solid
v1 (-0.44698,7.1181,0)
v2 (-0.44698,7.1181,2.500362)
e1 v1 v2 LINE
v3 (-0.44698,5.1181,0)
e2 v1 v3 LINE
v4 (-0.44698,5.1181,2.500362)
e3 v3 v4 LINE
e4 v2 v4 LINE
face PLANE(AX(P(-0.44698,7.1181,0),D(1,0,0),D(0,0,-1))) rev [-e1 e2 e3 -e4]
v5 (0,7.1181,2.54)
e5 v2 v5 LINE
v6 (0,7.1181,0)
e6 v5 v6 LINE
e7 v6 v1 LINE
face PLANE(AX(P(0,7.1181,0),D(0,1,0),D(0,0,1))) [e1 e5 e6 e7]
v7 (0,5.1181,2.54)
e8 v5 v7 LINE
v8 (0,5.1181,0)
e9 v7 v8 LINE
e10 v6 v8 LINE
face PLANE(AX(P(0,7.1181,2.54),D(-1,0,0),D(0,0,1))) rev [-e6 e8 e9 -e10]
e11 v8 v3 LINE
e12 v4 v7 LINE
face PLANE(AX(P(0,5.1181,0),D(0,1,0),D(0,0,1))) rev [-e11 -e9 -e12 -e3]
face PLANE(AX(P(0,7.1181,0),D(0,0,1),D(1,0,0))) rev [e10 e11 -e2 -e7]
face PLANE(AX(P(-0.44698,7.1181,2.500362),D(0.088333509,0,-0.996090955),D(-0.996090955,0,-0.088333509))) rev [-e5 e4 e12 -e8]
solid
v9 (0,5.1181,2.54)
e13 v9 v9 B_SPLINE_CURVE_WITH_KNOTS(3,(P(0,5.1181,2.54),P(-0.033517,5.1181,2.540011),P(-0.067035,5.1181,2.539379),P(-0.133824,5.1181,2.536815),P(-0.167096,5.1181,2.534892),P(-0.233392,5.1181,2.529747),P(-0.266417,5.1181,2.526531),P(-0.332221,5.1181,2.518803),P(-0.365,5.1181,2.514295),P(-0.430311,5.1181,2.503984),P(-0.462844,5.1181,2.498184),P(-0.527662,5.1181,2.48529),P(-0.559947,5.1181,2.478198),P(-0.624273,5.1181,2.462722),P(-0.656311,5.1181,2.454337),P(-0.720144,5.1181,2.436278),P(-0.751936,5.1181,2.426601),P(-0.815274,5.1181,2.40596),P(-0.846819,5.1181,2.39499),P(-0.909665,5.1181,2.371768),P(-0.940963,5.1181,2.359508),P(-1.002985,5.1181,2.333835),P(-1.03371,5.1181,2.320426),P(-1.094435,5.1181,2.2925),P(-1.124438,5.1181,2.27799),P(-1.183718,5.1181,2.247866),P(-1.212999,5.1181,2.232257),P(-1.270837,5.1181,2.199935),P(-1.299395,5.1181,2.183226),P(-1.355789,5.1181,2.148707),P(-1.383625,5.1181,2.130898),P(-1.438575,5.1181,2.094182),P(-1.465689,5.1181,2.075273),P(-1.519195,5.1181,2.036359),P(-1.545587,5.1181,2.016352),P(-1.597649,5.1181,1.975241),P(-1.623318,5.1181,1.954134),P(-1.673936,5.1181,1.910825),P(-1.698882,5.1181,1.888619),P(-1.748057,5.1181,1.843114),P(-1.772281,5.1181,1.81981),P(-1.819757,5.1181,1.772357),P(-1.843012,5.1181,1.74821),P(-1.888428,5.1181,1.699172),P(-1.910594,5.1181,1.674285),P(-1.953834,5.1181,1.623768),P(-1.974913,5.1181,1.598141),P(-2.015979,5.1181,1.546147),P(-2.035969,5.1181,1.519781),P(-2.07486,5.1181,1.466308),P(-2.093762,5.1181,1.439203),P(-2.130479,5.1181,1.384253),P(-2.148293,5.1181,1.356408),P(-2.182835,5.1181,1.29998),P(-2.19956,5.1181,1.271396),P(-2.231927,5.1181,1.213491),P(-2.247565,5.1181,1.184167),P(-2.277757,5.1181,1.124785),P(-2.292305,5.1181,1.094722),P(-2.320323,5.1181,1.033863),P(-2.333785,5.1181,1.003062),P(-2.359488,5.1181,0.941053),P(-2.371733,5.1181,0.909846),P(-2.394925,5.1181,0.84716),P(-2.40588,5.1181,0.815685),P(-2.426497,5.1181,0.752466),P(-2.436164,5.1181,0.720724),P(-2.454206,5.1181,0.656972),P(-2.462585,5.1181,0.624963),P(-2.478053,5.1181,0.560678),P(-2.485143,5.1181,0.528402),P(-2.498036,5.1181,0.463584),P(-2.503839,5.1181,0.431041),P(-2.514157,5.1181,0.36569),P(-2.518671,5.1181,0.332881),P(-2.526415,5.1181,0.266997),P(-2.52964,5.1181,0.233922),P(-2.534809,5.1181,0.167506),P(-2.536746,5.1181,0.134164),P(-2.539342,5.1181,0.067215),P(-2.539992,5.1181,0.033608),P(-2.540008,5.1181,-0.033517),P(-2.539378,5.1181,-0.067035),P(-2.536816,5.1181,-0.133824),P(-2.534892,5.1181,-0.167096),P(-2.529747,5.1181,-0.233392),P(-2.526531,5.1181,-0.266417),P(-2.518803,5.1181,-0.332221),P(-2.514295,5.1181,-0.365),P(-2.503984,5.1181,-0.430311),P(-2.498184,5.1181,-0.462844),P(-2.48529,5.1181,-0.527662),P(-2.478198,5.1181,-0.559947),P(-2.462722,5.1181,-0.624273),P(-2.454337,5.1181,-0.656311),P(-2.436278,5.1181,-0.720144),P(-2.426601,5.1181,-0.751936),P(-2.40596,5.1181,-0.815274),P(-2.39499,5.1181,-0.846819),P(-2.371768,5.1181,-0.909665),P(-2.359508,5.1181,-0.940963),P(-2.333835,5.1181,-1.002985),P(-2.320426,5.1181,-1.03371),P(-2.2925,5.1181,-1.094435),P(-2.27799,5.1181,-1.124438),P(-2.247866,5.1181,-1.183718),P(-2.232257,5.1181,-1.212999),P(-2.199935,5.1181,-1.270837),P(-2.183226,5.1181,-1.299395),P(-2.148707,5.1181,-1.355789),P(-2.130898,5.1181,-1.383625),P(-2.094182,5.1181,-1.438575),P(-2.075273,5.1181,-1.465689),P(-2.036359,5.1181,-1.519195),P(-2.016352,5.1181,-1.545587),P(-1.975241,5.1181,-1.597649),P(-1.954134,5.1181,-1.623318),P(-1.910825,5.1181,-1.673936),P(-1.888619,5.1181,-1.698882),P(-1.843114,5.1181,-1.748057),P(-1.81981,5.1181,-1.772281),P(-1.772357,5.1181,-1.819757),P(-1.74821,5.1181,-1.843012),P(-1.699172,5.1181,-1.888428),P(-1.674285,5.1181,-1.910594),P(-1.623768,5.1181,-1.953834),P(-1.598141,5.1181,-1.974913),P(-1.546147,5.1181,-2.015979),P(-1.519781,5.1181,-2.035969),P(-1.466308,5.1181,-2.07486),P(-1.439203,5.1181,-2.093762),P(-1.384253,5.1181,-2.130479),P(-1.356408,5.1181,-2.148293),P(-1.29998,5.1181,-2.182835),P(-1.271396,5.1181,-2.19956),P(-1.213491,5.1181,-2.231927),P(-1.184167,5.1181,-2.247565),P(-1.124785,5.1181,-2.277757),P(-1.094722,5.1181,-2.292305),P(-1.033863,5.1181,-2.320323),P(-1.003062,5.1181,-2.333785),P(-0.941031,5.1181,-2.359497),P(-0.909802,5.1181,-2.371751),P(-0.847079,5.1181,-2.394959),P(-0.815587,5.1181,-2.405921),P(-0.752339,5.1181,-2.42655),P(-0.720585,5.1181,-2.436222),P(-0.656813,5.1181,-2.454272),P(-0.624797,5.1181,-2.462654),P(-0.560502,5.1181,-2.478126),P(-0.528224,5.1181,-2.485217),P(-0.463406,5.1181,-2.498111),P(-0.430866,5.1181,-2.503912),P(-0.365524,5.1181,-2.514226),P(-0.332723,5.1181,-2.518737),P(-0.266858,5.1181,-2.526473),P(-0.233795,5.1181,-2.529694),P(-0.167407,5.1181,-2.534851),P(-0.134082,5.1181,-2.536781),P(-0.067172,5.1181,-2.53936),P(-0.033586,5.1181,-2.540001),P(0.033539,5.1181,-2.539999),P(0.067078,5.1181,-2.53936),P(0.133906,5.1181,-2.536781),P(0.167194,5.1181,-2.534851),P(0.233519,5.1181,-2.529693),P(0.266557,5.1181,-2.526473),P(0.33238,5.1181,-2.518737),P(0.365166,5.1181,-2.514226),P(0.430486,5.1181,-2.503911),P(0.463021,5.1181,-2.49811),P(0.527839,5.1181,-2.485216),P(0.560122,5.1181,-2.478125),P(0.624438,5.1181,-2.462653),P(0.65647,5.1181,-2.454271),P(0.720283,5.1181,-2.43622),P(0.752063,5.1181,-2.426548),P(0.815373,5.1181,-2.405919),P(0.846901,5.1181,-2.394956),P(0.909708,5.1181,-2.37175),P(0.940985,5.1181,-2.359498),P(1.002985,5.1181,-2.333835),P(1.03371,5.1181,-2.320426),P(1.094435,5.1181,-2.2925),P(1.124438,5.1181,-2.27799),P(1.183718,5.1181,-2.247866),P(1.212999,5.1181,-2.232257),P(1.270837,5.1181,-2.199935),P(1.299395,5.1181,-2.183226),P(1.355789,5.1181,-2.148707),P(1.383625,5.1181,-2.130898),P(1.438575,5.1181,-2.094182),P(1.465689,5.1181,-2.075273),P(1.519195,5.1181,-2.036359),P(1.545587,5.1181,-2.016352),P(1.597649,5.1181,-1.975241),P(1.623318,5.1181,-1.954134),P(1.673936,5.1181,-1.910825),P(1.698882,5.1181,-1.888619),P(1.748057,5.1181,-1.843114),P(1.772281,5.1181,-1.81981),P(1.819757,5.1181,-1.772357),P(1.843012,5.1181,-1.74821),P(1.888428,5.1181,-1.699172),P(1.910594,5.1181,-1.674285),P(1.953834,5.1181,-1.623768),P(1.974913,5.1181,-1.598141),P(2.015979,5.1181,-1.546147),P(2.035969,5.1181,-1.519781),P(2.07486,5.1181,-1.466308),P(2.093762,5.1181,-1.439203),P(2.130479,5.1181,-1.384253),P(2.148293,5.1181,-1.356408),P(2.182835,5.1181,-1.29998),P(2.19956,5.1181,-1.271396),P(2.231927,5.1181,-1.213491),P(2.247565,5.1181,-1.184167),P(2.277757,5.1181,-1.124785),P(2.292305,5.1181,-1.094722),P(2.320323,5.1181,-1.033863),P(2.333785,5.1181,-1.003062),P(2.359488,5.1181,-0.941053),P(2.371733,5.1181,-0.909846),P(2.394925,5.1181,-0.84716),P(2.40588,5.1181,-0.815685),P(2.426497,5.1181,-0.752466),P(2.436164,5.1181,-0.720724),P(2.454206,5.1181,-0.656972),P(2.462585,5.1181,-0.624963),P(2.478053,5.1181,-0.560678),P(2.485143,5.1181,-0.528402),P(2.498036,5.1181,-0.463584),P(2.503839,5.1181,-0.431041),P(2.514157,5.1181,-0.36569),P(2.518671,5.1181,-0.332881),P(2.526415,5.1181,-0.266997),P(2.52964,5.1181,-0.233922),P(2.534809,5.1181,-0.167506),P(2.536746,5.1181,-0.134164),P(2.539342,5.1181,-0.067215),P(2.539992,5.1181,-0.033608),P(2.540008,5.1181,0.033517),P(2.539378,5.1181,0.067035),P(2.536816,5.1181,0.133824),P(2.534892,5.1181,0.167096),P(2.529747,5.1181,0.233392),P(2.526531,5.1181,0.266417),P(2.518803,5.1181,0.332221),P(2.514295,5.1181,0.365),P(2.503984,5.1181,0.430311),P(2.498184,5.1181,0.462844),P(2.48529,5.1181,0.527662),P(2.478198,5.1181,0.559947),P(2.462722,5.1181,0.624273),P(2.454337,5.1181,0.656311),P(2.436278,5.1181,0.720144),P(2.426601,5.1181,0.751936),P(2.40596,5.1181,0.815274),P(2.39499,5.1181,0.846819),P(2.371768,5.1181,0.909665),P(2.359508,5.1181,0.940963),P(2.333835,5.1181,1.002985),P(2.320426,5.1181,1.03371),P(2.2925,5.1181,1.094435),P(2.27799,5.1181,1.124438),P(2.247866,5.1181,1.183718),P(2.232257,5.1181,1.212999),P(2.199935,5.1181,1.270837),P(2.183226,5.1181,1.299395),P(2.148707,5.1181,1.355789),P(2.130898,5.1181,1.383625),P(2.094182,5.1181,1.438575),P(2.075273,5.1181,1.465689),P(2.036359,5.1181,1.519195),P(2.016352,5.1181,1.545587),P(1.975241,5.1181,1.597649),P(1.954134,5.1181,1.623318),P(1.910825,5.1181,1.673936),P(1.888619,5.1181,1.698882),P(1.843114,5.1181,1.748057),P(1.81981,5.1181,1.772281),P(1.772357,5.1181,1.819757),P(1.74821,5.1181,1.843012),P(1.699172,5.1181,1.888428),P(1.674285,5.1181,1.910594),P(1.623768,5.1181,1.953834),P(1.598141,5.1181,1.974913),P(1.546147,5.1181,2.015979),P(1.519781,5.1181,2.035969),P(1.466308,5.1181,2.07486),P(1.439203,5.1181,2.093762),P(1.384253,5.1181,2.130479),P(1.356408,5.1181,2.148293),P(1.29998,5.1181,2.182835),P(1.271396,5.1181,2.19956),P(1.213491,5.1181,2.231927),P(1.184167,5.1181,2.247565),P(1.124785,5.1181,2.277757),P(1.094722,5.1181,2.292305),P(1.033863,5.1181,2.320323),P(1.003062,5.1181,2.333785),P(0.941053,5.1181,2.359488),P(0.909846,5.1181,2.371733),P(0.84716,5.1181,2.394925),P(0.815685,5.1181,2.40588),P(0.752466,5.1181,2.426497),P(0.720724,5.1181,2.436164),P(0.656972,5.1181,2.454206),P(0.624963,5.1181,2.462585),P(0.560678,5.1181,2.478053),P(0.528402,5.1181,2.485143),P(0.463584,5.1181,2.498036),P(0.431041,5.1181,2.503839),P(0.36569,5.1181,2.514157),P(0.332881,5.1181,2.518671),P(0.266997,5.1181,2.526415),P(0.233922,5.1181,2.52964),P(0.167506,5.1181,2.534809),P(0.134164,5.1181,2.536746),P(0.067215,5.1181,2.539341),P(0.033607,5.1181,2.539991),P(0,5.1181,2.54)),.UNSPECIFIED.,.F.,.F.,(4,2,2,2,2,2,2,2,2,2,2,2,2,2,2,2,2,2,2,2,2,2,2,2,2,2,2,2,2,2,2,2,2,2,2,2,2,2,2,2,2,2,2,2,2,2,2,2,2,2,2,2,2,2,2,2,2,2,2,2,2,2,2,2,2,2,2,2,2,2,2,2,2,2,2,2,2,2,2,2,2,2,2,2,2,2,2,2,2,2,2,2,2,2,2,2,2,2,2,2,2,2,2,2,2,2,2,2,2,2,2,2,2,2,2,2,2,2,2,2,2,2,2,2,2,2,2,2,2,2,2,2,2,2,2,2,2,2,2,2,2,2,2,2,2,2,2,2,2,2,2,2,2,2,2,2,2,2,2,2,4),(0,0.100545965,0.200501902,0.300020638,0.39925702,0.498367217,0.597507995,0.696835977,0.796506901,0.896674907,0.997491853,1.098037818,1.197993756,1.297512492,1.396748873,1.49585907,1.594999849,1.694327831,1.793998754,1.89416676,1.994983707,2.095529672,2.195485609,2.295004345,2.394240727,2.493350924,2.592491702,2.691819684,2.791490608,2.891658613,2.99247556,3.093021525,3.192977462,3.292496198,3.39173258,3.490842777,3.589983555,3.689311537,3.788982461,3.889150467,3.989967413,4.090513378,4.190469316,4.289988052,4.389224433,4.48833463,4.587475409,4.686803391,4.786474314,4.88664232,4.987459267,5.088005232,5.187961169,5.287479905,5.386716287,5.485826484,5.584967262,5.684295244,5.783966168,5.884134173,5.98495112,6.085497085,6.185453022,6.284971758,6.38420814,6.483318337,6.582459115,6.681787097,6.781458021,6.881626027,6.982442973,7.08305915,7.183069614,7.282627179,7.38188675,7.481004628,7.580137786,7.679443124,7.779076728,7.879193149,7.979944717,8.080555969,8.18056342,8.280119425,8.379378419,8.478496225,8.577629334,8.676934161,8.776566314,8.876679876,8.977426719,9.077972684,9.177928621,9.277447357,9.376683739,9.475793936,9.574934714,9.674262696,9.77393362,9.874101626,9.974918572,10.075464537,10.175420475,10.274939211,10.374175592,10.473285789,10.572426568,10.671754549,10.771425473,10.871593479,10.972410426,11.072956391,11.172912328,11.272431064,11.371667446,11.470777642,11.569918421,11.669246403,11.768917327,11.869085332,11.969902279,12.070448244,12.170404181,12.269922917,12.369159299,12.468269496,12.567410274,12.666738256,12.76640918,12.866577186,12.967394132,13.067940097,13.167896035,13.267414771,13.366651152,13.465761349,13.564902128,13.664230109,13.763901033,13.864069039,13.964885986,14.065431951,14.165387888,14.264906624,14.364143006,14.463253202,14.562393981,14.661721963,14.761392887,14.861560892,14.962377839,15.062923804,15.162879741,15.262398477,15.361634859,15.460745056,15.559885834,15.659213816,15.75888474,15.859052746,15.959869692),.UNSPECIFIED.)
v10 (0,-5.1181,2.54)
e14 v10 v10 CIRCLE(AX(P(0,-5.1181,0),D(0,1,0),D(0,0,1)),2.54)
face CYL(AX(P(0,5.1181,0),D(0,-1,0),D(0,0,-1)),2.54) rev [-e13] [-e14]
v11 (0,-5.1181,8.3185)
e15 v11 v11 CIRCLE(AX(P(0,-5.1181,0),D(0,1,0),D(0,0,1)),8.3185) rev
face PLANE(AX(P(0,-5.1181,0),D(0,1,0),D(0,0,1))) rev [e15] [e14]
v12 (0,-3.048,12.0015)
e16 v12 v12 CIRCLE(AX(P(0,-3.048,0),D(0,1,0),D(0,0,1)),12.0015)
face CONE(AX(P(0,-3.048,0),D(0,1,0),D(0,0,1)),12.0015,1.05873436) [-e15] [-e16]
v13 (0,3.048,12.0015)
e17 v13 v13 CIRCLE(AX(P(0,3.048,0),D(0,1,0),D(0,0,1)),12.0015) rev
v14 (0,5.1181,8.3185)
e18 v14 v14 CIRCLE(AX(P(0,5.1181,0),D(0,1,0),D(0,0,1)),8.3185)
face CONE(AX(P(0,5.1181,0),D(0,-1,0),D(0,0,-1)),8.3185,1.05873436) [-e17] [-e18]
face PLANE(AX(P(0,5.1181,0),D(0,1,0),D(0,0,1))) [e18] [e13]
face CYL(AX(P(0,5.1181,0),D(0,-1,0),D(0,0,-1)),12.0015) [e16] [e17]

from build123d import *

# Parameters (mm, degrees)
SKETCH1_R               = 12.0015
BOSS_EXTRUDE1_DEPTH     = 5.1181
CUT_EXTRUDE1_DEPTH      = 20.820489271
CUT_EXTRUDE1_DEPTH_BACK = 20.820489271
SKETCH2_R               = 2.54
CHAMFER4_SIZE           = 3.683
CHAMFER4_SIZE2          = 2.0701
BOSS_EXTRUDE2_DEPTH     = 2


with BuildPart() as part:
    # Sketch1 → Boss-Extrude1 (new, symmetric)
    with BuildSketch(Plane(origin=(0, 0, 0), x_dir=(1, 0, 0), z_dir=(0, 1, 0))):
        with Locations(Location((0, 0, 0), (0, 0, 270))):
            Circle(SKETCH1_R)
    extrude(amount=BOSS_EXTRUDE1_DEPTH, both=True)

    # Sketch2 → Cut-Extrude1 (cut, two sides: drawn at the far end of the back side and taken through both)
    with BuildSketch(Plane.XZ.offset(5.1181).offset(-CUT_EXTRUDE1_DEPTH_BACK)):
        with Locations(Location((0, 0, 0), (0, 0, 270))):
            Circle(SKETCH2_R)
    extrude(amount=CUT_EXTRUDE1_DEPTH + CUT_EXTRUDE1_DEPTH_BACK, mode=Mode.SUBTRACT)

    # Chamfer2: read off the stored shape, not the designer's step
    # Chamfer2 outline → Chamfer2 (revolve, cut)
    with BuildSketch(Plane.XY):
        Polygon((12.0015, 5.1181), (8.3185, 5.1181), (12.0015, 3.048), align=None)
    revolve(axis=Axis((0, 0, 0), (0, 1, 0)), mode=Mode.SUBTRACT)

    # Chamfer4
    chamfer4_edges = [part.edges().sort_by_distance(p)[0] for p in [
        (0, -5.1181, -12.0015),
    ]]
    chamfer4_side = [part.faces().sort_by_distance(p)[0] for p in [
        (0, -5.1181, -11.662046319),
    ]]
    chamfer(chamfer4_edges, length=CHAMFER4_SIZE, length2=CHAMFER4_SIZE2, reference=chamfer4_side[0])


with BuildPart() as body_2:
    # Sketch4 → Boss-Extrude2 (new body)
    with BuildSketch(Plane(origin=(0, 5.1181, 0), x_dir=(1, 0, 0), z_dir=(0, 1, 0))):
        Polygon((0, 0), (-0.446980105, 0), (-0.446980105, -2.500361731), (0, -2.54), align=None)
    extrude(amount=BOSS_EXTRUDE2_DEPTH)


solid = Compound([part.part, body_2.part])
